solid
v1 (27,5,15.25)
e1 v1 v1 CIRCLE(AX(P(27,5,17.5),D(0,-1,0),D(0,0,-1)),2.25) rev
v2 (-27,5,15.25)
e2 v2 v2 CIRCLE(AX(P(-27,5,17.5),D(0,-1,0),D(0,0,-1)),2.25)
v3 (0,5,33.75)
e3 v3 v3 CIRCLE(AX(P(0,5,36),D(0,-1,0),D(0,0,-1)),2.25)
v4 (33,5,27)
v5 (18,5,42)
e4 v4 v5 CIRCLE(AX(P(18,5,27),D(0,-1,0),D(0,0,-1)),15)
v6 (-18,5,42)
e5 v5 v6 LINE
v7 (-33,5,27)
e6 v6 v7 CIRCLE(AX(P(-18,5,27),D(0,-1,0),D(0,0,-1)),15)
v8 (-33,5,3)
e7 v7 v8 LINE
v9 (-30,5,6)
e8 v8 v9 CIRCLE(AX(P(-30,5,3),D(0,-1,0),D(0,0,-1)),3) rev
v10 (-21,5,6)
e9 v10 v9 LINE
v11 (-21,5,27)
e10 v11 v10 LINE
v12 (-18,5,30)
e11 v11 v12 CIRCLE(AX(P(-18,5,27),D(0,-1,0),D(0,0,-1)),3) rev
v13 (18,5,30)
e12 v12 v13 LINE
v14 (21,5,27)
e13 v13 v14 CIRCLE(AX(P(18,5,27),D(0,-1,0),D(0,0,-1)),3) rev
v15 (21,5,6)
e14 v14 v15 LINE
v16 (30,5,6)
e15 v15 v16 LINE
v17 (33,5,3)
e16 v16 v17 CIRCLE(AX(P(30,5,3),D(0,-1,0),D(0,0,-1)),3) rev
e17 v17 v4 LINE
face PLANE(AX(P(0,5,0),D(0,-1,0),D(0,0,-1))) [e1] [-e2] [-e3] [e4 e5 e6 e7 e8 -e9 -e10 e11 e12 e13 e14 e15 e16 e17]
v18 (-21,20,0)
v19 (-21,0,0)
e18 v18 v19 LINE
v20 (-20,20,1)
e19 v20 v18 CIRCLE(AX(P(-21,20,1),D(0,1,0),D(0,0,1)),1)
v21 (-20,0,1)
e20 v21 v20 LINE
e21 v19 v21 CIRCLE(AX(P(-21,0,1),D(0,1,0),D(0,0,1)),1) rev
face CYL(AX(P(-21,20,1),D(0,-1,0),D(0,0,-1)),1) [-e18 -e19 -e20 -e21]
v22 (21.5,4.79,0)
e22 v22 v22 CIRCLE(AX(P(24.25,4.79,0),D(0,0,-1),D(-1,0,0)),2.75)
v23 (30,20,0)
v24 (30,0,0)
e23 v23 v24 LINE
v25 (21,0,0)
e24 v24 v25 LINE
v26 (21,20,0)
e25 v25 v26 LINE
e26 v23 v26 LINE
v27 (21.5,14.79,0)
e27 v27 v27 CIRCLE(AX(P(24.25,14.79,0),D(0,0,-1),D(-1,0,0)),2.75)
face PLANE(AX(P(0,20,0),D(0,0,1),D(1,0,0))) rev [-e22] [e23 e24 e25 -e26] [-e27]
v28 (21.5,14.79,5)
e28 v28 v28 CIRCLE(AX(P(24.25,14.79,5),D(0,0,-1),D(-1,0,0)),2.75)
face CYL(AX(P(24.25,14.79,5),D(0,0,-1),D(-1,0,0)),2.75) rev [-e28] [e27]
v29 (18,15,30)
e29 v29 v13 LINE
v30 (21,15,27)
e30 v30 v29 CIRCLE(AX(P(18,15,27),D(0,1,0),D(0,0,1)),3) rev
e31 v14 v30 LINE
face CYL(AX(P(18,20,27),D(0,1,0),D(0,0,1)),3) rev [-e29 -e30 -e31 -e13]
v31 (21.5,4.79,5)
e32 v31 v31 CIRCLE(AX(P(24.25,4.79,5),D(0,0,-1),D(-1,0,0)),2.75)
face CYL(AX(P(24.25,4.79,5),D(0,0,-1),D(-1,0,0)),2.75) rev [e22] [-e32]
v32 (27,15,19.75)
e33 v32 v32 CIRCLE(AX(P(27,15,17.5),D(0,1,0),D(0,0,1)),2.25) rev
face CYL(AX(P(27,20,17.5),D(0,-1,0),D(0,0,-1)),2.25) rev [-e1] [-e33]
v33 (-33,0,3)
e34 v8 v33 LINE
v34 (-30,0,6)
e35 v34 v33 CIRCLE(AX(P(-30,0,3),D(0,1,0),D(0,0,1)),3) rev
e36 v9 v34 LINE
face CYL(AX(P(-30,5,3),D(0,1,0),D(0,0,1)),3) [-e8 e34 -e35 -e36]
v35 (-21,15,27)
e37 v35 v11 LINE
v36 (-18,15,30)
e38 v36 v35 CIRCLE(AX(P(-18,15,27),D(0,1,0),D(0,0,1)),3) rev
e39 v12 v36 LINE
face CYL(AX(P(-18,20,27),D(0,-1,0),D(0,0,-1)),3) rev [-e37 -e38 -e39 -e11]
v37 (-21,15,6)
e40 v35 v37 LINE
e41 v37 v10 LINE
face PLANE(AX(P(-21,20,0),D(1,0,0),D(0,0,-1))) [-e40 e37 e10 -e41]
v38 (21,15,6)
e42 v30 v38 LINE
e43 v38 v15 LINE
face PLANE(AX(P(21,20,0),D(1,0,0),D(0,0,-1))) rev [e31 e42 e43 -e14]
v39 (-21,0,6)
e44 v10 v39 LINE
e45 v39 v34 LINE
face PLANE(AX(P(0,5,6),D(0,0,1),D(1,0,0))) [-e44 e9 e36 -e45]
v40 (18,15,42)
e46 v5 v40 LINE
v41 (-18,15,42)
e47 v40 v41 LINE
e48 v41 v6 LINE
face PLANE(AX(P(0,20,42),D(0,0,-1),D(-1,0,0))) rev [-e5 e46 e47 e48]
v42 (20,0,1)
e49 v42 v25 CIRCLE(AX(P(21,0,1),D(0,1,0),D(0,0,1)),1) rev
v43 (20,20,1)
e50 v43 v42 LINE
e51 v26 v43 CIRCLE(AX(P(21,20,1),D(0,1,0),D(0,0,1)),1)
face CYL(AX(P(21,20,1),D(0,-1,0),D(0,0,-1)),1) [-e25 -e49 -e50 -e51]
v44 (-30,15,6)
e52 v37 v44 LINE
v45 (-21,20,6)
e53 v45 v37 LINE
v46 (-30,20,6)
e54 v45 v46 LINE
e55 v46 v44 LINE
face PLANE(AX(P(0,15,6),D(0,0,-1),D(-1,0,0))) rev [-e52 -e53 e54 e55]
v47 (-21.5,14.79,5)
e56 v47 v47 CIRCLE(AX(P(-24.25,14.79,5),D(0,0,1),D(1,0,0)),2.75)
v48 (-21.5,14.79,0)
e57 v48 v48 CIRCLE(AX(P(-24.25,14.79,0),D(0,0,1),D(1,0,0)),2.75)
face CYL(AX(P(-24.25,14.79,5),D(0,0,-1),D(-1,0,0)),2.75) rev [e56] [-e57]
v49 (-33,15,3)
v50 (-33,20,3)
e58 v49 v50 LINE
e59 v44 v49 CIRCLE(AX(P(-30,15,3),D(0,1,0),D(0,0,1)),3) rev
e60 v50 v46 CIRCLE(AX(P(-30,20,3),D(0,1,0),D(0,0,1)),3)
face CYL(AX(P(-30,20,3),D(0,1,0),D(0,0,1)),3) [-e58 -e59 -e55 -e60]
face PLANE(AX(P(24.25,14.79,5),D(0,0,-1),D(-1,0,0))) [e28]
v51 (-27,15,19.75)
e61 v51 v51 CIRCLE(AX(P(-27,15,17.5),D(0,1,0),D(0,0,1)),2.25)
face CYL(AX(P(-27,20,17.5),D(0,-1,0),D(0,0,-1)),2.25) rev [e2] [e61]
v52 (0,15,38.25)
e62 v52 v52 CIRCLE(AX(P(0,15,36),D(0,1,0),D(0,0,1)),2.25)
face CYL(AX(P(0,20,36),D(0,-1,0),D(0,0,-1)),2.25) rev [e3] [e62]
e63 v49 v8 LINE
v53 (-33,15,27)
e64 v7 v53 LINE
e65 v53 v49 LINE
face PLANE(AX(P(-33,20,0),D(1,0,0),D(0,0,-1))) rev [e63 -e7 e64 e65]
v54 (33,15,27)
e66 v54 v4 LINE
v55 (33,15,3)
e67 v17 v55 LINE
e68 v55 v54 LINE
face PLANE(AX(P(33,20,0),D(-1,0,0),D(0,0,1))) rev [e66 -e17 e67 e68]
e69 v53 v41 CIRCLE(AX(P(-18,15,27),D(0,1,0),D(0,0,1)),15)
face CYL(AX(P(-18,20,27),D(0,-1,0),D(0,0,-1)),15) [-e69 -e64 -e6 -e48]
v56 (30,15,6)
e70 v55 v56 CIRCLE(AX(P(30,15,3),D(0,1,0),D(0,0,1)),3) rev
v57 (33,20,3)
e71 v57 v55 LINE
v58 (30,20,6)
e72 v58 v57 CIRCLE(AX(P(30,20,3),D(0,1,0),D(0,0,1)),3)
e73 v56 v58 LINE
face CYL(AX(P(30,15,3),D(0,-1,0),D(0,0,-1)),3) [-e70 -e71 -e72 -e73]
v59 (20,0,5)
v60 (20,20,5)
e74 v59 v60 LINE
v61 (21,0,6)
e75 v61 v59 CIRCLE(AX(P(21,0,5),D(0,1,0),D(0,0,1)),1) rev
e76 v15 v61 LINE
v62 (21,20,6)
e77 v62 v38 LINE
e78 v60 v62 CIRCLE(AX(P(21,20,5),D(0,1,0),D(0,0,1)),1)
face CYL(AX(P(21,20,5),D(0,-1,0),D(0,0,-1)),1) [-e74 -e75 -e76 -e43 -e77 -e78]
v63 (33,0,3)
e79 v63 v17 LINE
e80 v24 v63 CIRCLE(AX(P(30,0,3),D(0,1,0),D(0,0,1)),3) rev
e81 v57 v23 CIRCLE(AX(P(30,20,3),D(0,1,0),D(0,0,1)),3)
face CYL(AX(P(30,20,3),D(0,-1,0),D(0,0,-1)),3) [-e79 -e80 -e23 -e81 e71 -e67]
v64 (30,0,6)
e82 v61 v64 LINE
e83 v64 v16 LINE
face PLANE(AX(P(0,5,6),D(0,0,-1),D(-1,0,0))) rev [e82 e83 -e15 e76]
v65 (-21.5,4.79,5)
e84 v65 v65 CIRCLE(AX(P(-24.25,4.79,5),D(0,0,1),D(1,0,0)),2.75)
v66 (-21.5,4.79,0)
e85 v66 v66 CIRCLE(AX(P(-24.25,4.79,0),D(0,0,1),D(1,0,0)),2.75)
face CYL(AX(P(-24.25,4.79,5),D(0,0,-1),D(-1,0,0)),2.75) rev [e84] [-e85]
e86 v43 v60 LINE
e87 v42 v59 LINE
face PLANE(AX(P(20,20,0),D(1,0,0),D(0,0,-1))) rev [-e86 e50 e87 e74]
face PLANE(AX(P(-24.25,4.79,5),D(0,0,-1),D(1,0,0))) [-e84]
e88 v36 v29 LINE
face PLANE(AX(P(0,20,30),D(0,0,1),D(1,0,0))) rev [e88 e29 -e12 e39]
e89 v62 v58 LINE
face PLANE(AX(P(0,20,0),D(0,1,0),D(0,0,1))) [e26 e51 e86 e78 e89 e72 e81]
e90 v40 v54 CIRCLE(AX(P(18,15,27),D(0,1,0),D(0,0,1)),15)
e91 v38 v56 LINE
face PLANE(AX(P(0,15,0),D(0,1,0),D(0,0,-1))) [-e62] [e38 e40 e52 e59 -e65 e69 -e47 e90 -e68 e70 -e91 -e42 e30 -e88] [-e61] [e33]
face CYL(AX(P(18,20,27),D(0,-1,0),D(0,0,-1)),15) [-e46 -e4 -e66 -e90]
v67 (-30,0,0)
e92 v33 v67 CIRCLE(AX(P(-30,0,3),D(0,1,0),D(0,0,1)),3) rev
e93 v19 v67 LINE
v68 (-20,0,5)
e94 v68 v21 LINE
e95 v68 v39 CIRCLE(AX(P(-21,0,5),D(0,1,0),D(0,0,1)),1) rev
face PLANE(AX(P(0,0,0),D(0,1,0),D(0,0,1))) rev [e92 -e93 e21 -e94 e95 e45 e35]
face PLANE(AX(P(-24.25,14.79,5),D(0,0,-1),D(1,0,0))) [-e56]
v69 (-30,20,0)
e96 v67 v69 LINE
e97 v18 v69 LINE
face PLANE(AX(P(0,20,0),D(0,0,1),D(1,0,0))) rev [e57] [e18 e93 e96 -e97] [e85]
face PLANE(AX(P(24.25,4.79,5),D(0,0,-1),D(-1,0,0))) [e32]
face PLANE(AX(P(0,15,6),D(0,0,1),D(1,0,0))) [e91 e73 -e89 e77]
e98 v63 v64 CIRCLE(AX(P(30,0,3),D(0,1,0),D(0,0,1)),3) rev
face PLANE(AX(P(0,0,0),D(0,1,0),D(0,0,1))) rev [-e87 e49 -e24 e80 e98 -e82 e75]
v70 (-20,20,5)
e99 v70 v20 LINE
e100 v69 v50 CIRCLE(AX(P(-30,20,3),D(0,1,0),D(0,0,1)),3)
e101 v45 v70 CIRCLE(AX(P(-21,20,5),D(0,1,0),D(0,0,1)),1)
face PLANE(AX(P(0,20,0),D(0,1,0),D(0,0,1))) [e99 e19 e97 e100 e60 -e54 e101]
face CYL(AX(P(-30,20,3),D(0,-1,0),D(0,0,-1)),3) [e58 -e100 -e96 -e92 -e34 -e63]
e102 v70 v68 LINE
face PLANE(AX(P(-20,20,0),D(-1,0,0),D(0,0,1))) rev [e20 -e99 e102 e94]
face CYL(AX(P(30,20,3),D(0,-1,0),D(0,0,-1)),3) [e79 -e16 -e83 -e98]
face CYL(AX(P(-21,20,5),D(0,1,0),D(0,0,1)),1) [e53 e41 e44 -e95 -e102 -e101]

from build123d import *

# Parameters (mm, degrees)
BOSS_EXTRUDE1_DEPTH = 20
SKETCH2_R           = 2.75
CUT_EXTRUDE1_DEPTH  = 5
FILLET1_R           = 1
SKETCH7_W           = 42
SKETCH7_H           = 12
CUT_EXTRUDE3_DEPTH  = 5
SKETCH9_R           = 2.25
CUT_EXTRUDE5_DEPTH  = 56.479726027
FILLET3_R           = 15
FILLET4_R           = 3
FILLET5_R           = 3


# Some blends are built 0.0001 mm under size
with BuildPart() as part:
    # Sketch1 → Boss-Extrude1 (new body)
    with BuildSketch(Plane(origin=(0, 0, 0), x_dir=(1, 0, 0), z_dir=(0, 1, 0))):
        Polygon((21, -30), (-21, -30), (-21, -6), (-20, -6), (-20, 0), (-33, 0), (-33, -42), (33, -42), (33, 0), (20, 0), (20, -6), (21, -6), align=None)
    extrude(amount=BOSS_EXTRUDE1_DEPTH)

    # Sketch2 → Cut-Extrude1 (cut)
    with BuildSketch(Plane(origin=(0, 0, 0), x_dir=(-1, 0, 0), z_dir=(0, 0, -1))):
        with Locations((-24.25, 14.79)):
            Circle(SKETCH2_R)
        with Locations((-24.25, 4.79)):
            Circle(SKETCH2_R)
    cut_extrude1 = extrude(amount=-CUT_EXTRUDE1_DEPTH, mode=Mode.SUBTRACT)

    # Mirror1: Cut-Extrude1 across plane
    add(cut_extrude1.mirror(Plane(origin=(0, 0, 0), x_dir=(0, 0, 1), z_dir=(1, 0, 0))), mode=Mode.SUBTRACT)

    # Fillet1
    fillet1_edges = [part.edges().sort_by_distance(p)[0] for p in [
        (-20, 10, 0),
        (20, 10, 0),
        (20, 10, 6),
        (-20, 10, 6),
    ]]
    fillet(fillet1_edges, radius=FILLET1_R - 0.0001)  # a hair under: the kernel refuses the full size

    # Sketch7 → Cut-Extrude3 (cut)
    with BuildSketch(Plane.XZ):
        Polygon((-33, 6), (-21, 6), (-21, 30), (-21, 42), (-33, 42), align=None)
        with Locations((0, 36)):
            Rectangle(SKETCH7_W, SKETCH7_H)
        Polygon((21, 42), (21, 30), (21, 6), (33, 6), (33, 42), align=None)
    cut_extrude3 = extrude(amount=-CUT_EXTRUDE3_DEPTH, mode=Mode.SUBTRACT)

    # Mirror2: Cut-Extrude3 across plane
    add(cut_extrude3.mirror(Plane.ZX.offset(10)), mode=Mode.SUBTRACT)

    # Sketch9 → Cut-Extrude5 (cut, through all)
    with BuildSketch(Plane.XZ.offset(-5)):
        with Locations(Location((-27, 17.5, 0), (0, 0, 270))):
            Circle(SKETCH9_R)
        with Locations(Location((27, 17.5, 0), (0, 0, 270))):
            Circle(SKETCH9_R)
        with Locations(Location((0, 36, 0), (0, 0, 270))):
            Circle(SKETCH9_R)
    extrude(amount=-CUT_EXTRUDE5_DEPTH, mode=Mode.SUBTRACT)

    # Fillet3
    fillet3_edges = [part.edges().sort_by_distance(p)[0] for p in [
        (-33, 10, 42),
        (33, 10, 42),
    ]]
    fillet(fillet3_edges, radius=FILLET3_R)

    # Fillet4
    fillet4_edges = [part.edges().sort_by_distance(p)[0] for p in [
        (-21, 10, 30),
        (21, 10, 30),
    ]]
    fillet(fillet4_edges, radius=FILLET4_R)

    # Fillet5
    # the kernel refuses this fillet: 3 mm, written as the material it takes off along each edge
    with BuildSketch(Plane(origin=(-33, 27.5, 6), x_dir=(1, 0, 0), z_dir=(0, -1, 0)), Plane(origin=(33, -7.5, 6), x_dir=(-1, 0, 0), z_dir=(0, 1, 0))) as fillet5_piece_1:
        with BuildLine():
            CenterArc((FILLET5_R, -FILLET5_R), FILLET5_R, 90, 90)
            Line((0, -FILLET5_R), (0, 0))
            Line((0, 0), (FILLET5_R, 0))
        make_face()
    extrude(amount=12.5, mode=Mode.SUBTRACT)
    with BuildSketch(Plane(origin=(33, 27.5, 6), x_dir=(-1, 0, 0), z_dir=(0, -1, 0)), Plane(origin=(-33, -7.5, 6), x_dir=(1, 0, 0), z_dir=(0, 1, 0))) as fillet5_piece_2:
        with BuildLine():
            CenterArc((FILLET5_R, FILLET5_R), FILLET5_R, 180, 90)
            Line((0, FILLET5_R), (0, 0))
            Line((0, 0), (FILLET5_R, 0))
        make_face()
    extrude(amount=12.5, mode=Mode.SUBTRACT)
    with BuildSketch(Plane(origin=(-33, -7.5, 0), x_dir=(0, 0, 1), z_dir=(0, 1, 0))) as fillet5_piece_3:
        with BuildLine():
            CenterArc((FILLET5_R, FILLET5_R), FILLET5_R, 180, 90)
            Line((0, FILLET5_R), (0, 0))
            Line((0, 0), (FILLET5_R, 0))
        make_face()
    extrude(amount=35, mode=Mode.SUBTRACT)
    with BuildSketch(Plane(origin=(33, -7.5, 0), x_dir=(0, 0, 1), z_dir=(0, 1, 0))) as fillet5_piece_4:
        with BuildLine():
            CenterArc((FILLET5_R, -FILLET5_R), FILLET5_R, 90, 90)
            Line((0, -FILLET5_R), (0, 0))
            Line((0, 0), (FILLET5_R, 0))
        make_face()
    extrude(amount=35, mode=Mode.SUBTRACT)


solid = part.part
